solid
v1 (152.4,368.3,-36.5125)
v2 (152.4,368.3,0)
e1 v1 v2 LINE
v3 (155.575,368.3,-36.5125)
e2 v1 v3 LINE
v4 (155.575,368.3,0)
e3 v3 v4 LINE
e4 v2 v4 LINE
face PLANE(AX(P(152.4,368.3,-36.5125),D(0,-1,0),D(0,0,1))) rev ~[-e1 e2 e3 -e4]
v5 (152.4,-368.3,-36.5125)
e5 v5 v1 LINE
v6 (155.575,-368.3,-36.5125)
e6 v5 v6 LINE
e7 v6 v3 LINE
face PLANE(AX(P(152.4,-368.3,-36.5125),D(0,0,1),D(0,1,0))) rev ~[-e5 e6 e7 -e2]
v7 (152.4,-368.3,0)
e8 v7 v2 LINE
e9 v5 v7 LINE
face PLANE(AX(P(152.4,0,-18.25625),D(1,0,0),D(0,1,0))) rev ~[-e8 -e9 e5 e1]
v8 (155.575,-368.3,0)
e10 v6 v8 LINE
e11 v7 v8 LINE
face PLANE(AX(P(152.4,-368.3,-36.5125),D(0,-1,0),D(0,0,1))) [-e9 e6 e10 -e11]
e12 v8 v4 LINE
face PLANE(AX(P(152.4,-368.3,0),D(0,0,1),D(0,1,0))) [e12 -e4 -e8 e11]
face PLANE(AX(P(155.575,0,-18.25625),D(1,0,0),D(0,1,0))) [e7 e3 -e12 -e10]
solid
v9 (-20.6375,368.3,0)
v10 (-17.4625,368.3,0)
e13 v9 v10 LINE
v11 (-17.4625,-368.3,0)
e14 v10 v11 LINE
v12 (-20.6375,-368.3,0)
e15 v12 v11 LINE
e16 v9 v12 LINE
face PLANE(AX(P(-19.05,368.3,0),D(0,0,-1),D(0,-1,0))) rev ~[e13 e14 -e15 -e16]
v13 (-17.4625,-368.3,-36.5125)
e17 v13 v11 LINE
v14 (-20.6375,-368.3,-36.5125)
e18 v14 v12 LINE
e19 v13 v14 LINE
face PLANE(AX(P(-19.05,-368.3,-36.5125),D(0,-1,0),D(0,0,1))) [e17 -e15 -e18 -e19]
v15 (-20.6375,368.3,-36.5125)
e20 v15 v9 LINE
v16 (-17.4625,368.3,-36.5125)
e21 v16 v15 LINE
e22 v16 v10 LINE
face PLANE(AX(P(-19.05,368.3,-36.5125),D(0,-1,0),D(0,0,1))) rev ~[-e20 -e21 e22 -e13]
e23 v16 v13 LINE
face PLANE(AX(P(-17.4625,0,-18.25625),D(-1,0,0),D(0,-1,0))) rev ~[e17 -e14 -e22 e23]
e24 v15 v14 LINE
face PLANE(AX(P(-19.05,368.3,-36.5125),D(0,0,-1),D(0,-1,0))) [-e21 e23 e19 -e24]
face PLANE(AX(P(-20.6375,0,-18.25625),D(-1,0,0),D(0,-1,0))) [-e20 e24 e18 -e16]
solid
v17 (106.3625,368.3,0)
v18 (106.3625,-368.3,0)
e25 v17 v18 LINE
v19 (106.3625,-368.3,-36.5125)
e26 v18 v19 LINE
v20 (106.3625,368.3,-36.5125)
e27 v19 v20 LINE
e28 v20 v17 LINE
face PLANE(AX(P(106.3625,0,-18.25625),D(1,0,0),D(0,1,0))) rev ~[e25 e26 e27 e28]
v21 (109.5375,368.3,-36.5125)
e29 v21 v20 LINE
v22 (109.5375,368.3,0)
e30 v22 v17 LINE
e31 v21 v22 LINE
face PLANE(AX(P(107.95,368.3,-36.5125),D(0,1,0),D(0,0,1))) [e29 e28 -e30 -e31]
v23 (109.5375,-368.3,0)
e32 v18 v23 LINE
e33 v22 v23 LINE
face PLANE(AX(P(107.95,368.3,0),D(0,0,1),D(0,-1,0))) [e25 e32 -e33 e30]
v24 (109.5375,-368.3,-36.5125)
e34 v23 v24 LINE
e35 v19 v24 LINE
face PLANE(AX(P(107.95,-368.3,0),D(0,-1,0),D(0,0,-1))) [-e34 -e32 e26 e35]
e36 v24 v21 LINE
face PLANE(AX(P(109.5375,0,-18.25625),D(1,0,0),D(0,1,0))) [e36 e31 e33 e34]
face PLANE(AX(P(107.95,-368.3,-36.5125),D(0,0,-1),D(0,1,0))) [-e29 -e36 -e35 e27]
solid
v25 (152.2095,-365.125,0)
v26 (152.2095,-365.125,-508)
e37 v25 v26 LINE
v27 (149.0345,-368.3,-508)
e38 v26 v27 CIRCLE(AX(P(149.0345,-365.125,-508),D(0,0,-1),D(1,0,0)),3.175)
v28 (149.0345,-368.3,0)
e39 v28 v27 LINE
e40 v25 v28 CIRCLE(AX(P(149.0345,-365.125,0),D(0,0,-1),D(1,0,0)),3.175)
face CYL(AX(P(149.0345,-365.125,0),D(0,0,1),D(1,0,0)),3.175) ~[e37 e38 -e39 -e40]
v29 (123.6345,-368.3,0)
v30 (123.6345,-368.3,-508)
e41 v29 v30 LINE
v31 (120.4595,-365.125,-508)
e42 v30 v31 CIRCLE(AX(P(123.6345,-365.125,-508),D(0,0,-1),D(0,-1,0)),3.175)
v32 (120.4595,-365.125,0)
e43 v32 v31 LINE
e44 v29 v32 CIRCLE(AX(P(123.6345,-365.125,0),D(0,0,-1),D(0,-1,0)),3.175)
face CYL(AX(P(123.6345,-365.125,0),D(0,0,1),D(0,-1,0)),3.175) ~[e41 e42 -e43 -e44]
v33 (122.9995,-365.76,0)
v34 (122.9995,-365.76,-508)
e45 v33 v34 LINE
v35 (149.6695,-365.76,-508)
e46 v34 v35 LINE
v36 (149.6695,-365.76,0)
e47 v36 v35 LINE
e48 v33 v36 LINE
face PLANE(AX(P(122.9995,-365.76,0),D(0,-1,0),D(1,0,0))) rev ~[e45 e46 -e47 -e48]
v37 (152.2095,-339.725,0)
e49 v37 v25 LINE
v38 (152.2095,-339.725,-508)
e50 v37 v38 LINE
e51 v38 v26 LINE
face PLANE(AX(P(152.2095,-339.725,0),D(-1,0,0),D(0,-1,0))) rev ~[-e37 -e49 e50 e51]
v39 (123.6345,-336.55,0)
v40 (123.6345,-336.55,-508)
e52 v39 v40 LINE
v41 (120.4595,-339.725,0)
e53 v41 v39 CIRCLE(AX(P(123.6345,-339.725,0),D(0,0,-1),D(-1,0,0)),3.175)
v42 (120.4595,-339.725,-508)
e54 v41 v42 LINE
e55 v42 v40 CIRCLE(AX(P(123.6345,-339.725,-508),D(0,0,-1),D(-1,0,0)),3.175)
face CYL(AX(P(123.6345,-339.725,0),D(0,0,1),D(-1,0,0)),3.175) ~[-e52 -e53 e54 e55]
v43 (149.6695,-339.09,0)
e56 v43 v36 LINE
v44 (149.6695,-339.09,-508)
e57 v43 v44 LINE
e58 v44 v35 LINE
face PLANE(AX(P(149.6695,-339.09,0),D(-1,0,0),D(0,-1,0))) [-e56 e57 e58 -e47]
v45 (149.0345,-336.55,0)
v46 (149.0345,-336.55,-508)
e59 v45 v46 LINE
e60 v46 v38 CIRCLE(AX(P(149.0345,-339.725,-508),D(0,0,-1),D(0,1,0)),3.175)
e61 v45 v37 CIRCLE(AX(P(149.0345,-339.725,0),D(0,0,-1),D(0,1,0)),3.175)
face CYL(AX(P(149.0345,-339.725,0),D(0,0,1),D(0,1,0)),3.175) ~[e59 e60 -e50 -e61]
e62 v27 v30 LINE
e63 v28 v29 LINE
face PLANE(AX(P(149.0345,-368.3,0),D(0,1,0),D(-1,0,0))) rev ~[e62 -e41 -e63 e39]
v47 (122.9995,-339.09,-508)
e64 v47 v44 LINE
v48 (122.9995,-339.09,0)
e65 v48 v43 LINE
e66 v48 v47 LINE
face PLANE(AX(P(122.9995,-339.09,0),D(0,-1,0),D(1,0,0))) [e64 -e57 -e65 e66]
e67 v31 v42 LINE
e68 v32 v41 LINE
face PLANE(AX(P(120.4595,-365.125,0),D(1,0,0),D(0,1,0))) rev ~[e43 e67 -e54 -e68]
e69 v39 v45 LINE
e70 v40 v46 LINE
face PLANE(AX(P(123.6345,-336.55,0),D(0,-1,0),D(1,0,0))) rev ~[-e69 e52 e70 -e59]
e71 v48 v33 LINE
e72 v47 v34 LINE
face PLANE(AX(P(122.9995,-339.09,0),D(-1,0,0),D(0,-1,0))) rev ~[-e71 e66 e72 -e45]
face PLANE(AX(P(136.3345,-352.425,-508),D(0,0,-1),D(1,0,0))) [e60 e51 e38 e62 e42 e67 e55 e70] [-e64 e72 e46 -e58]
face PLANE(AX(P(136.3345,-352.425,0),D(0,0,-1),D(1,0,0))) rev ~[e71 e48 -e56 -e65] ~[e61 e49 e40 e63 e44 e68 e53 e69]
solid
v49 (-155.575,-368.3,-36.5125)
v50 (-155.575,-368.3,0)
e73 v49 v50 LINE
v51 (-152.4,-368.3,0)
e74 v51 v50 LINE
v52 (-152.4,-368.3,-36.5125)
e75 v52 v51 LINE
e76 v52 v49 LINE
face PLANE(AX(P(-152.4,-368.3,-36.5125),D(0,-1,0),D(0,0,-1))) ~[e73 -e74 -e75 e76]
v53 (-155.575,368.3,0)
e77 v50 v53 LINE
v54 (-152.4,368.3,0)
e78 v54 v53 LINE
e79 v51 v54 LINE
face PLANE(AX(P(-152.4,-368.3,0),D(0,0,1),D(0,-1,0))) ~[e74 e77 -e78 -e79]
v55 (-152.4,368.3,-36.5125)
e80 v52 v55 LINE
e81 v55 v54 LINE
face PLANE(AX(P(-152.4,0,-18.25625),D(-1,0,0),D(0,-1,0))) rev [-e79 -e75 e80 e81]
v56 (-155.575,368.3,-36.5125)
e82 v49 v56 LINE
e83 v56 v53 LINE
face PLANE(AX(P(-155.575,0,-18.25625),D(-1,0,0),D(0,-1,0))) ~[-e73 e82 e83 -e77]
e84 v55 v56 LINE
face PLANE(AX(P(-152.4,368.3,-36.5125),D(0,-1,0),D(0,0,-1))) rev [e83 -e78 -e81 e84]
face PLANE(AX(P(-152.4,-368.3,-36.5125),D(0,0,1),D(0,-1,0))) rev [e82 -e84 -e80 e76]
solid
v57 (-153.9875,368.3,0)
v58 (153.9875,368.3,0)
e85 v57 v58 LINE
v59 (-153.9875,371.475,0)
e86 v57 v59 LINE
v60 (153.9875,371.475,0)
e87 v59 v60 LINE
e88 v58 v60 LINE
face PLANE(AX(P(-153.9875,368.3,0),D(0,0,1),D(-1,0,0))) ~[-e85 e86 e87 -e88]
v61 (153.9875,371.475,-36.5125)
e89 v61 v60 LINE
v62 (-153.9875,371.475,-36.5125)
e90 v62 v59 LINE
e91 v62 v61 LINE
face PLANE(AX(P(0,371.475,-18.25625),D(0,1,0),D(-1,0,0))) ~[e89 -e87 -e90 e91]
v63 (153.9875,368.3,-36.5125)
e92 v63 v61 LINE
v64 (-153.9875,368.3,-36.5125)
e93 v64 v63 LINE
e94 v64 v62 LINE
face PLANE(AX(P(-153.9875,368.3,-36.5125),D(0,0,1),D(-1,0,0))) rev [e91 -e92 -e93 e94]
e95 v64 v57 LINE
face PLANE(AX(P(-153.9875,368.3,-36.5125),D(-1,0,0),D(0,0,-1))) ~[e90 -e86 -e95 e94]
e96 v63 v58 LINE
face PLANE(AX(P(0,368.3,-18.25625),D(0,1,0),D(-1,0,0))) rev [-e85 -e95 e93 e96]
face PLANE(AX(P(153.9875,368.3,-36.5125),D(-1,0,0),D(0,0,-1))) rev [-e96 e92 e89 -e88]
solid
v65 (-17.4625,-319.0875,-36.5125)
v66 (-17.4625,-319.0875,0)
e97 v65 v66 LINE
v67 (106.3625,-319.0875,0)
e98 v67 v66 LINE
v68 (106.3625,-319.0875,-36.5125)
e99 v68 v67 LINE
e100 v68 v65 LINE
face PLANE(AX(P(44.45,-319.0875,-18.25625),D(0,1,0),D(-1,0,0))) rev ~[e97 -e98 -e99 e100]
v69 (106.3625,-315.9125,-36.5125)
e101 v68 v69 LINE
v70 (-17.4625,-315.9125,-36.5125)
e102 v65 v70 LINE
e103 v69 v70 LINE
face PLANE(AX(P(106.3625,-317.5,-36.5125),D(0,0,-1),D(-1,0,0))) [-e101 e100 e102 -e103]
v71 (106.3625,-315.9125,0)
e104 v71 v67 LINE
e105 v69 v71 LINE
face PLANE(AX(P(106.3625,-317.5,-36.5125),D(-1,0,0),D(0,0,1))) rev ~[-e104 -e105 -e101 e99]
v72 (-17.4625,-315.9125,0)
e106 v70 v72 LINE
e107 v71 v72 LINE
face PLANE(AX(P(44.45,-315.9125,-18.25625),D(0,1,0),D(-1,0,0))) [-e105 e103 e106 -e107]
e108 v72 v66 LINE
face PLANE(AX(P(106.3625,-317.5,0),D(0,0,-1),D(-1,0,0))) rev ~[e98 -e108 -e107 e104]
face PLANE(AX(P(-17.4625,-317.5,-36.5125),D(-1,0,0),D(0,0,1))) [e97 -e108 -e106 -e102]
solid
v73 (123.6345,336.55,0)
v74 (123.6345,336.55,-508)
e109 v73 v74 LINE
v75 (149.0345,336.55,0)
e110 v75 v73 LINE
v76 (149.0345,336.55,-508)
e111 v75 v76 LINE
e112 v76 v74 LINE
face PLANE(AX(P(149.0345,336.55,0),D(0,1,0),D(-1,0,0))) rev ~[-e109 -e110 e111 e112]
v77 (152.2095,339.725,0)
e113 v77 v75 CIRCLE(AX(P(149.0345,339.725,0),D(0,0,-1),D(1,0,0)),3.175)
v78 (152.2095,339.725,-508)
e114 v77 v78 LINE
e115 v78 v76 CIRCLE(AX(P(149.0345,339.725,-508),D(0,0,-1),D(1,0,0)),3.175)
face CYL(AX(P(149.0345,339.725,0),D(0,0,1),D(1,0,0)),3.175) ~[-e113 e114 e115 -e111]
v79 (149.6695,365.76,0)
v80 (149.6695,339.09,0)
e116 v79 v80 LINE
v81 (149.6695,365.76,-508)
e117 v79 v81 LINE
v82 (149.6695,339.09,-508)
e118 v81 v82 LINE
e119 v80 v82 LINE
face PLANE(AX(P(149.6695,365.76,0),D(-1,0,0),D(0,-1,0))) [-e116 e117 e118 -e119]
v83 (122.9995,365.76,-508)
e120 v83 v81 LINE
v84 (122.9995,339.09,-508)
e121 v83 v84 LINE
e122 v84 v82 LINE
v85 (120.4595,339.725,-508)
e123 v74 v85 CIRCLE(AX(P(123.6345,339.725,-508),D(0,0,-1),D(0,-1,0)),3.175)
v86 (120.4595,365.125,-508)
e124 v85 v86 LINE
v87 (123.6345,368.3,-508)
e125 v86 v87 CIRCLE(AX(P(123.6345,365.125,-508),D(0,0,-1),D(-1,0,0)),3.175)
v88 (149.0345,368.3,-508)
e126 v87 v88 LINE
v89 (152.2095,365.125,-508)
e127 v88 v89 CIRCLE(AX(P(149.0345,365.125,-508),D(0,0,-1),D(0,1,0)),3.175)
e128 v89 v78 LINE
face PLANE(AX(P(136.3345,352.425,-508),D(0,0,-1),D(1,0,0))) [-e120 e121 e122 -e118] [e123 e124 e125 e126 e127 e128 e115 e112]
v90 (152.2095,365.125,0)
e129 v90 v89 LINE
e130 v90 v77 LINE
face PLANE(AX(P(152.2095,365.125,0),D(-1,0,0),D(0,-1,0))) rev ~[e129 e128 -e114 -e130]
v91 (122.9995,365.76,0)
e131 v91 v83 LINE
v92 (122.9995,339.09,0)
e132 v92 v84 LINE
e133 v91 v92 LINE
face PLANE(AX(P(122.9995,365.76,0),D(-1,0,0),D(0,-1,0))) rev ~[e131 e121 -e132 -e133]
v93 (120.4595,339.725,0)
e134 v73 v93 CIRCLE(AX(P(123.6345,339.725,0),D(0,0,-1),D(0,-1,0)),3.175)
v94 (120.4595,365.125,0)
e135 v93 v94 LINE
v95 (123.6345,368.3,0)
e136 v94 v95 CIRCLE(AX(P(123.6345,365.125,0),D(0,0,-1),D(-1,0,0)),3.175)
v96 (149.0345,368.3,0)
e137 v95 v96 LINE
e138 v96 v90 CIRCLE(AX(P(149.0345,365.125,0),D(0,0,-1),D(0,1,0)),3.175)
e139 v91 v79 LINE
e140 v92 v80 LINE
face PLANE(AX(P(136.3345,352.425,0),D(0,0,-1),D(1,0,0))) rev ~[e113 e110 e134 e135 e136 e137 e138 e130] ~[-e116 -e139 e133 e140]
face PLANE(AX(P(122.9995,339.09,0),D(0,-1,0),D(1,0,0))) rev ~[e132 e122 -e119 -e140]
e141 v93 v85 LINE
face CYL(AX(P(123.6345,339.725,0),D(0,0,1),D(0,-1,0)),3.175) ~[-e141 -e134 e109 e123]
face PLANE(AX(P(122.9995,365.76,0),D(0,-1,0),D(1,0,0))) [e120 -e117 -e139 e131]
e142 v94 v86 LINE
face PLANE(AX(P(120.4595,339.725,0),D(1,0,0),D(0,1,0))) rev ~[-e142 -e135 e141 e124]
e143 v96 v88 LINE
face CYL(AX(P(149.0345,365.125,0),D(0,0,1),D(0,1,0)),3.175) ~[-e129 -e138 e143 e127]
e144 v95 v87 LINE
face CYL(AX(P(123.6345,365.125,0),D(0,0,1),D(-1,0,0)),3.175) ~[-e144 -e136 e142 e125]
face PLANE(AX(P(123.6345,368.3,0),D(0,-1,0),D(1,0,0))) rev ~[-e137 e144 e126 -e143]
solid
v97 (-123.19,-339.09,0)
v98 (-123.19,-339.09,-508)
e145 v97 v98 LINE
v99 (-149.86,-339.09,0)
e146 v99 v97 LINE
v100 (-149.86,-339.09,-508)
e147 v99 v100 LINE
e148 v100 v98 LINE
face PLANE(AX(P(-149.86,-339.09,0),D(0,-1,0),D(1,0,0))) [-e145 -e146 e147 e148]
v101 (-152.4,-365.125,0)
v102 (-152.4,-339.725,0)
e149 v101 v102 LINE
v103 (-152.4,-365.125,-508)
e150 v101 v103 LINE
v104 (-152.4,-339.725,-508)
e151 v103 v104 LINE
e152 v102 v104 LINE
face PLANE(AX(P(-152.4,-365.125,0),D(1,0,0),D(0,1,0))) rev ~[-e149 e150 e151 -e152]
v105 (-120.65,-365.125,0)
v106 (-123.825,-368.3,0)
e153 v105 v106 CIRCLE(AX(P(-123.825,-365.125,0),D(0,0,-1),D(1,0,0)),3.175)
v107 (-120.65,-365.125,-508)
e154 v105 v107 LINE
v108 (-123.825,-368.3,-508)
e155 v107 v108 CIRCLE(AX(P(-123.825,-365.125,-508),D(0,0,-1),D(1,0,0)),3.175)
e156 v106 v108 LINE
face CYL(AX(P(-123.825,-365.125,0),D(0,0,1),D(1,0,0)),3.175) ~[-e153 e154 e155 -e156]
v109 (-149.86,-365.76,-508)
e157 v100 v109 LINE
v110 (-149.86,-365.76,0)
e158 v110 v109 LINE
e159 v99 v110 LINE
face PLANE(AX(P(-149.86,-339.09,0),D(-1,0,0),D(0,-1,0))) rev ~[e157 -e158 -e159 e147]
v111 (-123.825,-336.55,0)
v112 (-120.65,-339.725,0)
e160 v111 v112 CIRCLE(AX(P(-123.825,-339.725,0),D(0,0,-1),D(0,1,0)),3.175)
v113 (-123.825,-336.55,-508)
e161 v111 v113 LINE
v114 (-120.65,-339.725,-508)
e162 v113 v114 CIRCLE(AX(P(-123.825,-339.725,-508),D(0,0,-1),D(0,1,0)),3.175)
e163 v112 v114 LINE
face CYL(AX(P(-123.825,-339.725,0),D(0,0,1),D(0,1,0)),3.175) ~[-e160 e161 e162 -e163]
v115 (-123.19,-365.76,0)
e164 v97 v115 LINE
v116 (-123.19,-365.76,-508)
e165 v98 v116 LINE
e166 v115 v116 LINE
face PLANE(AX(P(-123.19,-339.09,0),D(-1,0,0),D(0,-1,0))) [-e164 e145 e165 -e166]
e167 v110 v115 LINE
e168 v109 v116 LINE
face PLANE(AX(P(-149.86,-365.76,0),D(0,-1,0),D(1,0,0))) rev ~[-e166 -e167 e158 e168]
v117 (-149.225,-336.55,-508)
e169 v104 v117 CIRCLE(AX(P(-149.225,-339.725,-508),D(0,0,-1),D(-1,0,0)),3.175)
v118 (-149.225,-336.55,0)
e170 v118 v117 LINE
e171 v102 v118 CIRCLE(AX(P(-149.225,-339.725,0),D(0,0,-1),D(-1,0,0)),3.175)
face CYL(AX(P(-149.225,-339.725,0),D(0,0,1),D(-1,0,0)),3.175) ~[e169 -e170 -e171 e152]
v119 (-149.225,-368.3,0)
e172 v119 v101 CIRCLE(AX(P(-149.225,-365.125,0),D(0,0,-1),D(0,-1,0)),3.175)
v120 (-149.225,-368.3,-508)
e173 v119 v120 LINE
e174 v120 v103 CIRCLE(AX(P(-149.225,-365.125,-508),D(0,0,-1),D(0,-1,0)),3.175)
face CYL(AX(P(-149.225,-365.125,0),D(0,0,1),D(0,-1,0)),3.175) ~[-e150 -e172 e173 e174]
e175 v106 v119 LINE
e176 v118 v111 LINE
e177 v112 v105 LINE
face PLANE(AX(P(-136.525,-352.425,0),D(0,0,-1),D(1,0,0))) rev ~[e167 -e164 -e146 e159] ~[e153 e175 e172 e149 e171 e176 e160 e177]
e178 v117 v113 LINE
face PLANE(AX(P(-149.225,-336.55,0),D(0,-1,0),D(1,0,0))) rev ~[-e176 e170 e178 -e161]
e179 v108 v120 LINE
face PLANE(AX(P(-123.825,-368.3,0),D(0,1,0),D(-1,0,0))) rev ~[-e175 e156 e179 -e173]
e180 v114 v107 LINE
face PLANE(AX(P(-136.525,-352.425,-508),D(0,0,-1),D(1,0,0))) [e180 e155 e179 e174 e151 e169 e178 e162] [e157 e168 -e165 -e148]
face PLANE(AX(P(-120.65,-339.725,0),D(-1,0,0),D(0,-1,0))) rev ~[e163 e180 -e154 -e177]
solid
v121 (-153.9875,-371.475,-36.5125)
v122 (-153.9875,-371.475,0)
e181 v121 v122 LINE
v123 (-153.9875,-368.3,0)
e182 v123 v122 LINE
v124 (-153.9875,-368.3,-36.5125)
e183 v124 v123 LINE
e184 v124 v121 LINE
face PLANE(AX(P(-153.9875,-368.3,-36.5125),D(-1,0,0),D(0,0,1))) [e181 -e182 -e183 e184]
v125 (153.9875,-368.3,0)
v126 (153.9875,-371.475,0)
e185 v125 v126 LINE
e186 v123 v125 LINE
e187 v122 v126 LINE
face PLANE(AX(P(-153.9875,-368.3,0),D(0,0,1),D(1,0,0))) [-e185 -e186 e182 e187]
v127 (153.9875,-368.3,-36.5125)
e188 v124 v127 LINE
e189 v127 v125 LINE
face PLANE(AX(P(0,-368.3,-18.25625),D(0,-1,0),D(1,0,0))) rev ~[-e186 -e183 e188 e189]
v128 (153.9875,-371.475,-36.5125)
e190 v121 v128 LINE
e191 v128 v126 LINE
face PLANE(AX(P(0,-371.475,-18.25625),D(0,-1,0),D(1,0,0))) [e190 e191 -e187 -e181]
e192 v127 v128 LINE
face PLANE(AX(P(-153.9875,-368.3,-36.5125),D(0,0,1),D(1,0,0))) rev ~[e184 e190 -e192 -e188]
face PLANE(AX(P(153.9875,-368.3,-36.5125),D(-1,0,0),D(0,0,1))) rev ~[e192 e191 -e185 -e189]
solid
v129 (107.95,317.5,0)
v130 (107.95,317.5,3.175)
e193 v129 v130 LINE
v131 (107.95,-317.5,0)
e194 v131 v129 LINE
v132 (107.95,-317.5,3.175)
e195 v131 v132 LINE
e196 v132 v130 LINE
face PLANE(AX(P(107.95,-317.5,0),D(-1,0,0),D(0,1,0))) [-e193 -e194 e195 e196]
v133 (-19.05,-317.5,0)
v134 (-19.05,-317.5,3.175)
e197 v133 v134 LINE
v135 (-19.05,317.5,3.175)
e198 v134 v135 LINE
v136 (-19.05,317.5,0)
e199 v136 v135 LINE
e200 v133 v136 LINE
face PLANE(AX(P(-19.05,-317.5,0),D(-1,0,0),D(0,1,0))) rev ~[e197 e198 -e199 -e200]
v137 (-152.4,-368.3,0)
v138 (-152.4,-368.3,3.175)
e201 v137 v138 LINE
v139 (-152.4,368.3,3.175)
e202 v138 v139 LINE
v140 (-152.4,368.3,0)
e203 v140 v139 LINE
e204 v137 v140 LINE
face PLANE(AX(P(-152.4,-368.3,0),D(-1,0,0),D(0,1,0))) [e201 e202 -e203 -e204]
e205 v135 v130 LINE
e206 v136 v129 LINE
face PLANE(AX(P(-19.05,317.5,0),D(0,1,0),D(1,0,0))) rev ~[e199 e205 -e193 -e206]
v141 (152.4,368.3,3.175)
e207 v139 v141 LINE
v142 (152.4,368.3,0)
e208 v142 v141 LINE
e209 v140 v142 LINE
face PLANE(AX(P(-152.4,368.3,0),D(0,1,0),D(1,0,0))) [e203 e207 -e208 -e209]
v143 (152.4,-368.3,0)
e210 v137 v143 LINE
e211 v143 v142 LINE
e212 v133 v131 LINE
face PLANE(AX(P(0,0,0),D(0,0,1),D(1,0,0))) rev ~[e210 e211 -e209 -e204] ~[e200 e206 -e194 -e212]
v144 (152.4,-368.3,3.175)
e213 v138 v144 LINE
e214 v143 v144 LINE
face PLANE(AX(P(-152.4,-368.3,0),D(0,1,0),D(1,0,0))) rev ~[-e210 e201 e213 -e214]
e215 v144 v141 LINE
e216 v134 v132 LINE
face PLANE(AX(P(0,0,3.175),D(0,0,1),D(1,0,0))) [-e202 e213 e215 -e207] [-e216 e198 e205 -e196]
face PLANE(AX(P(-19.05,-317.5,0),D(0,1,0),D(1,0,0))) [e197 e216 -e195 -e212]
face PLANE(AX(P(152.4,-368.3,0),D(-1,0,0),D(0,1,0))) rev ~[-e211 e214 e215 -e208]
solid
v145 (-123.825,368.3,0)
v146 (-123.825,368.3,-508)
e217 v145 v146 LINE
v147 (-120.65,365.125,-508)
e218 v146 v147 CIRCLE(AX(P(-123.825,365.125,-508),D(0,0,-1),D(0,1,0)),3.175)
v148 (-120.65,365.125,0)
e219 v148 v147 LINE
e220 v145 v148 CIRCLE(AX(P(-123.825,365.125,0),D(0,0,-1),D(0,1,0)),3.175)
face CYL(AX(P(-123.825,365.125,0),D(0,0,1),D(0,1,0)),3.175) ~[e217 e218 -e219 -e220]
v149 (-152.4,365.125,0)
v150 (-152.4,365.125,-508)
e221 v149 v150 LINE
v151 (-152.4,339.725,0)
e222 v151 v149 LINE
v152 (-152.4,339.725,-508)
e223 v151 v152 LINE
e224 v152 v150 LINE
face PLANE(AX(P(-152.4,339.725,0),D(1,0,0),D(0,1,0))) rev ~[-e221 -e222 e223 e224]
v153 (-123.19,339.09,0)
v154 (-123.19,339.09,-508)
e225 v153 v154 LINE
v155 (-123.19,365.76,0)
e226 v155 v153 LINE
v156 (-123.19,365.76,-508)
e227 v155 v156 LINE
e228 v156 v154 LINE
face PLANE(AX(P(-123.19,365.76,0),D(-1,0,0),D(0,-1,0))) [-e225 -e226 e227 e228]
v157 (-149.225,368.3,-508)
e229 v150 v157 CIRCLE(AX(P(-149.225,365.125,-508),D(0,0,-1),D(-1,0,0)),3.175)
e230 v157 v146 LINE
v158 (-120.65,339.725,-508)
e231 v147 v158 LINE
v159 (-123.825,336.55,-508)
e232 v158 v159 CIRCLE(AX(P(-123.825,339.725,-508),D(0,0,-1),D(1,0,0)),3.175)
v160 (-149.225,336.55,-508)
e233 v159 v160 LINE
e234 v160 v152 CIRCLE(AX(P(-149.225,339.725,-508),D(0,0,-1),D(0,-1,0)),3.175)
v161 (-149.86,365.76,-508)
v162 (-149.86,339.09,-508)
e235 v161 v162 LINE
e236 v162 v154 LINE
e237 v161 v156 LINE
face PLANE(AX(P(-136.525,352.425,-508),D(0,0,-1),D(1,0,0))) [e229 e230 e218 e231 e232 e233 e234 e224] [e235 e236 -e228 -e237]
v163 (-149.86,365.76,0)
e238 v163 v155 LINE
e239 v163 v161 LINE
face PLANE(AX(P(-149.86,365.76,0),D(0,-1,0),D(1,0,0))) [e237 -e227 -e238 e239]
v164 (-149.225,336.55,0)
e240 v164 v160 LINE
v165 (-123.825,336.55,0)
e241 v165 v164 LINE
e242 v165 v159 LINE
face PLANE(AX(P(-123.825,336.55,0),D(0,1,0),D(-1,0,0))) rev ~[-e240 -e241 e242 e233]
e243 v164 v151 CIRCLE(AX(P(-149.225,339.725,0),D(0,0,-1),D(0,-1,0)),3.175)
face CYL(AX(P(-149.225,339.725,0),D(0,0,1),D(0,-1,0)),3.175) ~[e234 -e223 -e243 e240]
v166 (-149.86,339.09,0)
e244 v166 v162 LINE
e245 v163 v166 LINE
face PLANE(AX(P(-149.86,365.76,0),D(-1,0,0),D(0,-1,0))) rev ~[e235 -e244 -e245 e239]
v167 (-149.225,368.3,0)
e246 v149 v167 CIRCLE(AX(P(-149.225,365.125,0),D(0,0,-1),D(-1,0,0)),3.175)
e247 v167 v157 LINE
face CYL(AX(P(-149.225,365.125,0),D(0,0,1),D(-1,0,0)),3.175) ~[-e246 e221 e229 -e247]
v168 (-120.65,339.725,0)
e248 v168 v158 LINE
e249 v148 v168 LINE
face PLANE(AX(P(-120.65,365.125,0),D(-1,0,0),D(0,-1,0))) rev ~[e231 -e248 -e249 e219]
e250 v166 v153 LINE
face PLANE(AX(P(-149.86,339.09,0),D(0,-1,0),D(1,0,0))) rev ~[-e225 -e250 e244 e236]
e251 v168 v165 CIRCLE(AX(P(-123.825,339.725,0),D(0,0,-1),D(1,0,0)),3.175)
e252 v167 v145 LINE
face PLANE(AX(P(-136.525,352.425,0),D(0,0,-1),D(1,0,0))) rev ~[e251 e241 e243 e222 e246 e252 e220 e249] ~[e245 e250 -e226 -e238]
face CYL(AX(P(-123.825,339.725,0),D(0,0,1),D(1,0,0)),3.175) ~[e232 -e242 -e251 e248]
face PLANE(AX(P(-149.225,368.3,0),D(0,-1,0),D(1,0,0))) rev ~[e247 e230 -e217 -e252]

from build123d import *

# Parameters (mm, degrees)
F0_W      = 304.8
F0_H      = 736.6
F0_W_2    = 127
F0_H_2    = 635
F1_DEPTH  = 3.175
F2_W      = 736.6
F2_H      = 36.5125
F3_DEPTH  = 3.175
F5_W      = 307.975
F5_H      = 36.5125
F6_DEPTH  = 3.175
F9_W      = 736.6
F9_H      = 36.5125
F10_DEPTH = 1.5875
F13_DEPTH = 1.5875
F15_W     = 123.825
F15_H     = 36.5125
F16_DEPTH = 1.5875
F17_W     = 26.67
F17_H     = 26.67
F18_DEPTH = 508


with BuildPart() as f1:
    # F0 (on Top) → F1 (new body)
    with BuildSketch(Plane.XY):
        Rectangle(F0_W, F0_H)
        with Locations((44.45, 0)):
            Rectangle(F0_W_2, F0_H_2, mode=Mode.SUBTRACT)
    extrude(amount=F1_DEPTH)


with BuildPart() as f3:
    # F2 (on face) → F3 (new body)
    with BuildSketch(Plane.YZ.offset(152.4)):
        with Locations((0, -18.25625)):
            Rectangle(F2_W, F2_H)
    extrude(amount=F3_DEPTH)


with BuildPart() as f4_1:
    # F4: instance of F3
    add(f3.part.mirror(Plane.YZ))


with BuildPart() as f6:
    # F5 (on face) → F6 (new body)
    with BuildSketch(Plane.XZ.offset(368.3)):
        with Locations((0, -18.25625)):
            Rectangle(F5_W, F5_H)
    extrude(amount=F6_DEPTH)


with BuildPart() as f7_1:
    # F7: instance of F6
    add(f6.part.mirror(Plane.XZ))


with BuildPart() as f10:
    # F9 (on face) → F10 (new body, symmetric)
    with BuildSketch(Plane(origin=(-19.05, 0, 0), x_dir=(0, -1, 0), z_dir=(-1, 0, 0))):
        with Locations((0, -18.25625)):
            Rectangle(F9_W, F9_H)
    extrude(amount=F10_DEPTH, both=True)


with BuildPart() as f13:
    # F12 (on face) → F13 (new body, symmetric)
    with BuildSketch(Plane.YZ.offset(107.95)):
        Polygon((368.3, 0), (317.5, 0), (-317.5, 0), (-368.3, 0), (-368.3, -36.5125), (368.3, -36.5125), align=None)
    extrude(amount=F13_DEPTH, both=True)


with BuildPart() as f16:
    # F15 (on face) → F16 (new body, symmetric)
    with BuildSketch(Plane(origin=(0, -317.5, 0), x_dir=(-1, 0, 0), z_dir=(0, 1, 0))):
        with Locations((-44.45, -18.25625)):
            Rectangle(F15_W, F15_H)
    extrude(amount=F16_DEPTH, both=True)


with BuildPart() as f18:
    # F17 (on face) → F18 (new body)
    with BuildSketch(Plane(origin=(0, 0, 0), x_dir=(1, 0, 0), z_dir=(0, 0, -1))):
        with BuildLine():
            Line((-123.825, 368.3), (-149.225, 368.3))
            ThreePointArc((-149.225, 368.3), (-151.4700640303, 367.3700640303), (-152.4, 365.125))
            Line((-152.4, 365.125), (-152.4, 339.725))
            ThreePointArc((-152.4, 339.725), (-151.4700640303, 337.4799359697), (-149.225, 336.55))
            Line((-149.225, 336.55), (-123.825, 336.55))
            ThreePointArc((-123.825, 336.55), (-121.5799359697, 337.4799359697), (-120.65, 339.725))
            Line((-120.65, 339.725), (-120.65, 365.125))
            ThreePointArc((-120.65, 365.125), (-121.5799359697, 367.3700640303), (-123.825, 368.3))
        make_face()
        with Locations((-136.525, 352.425)):
            Rectangle(F17_W, F17_H, mode=Mode.SUBTRACT)
    extrude(amount=F18_DEPTH)


with BuildPart() as f18b:
    # F17 (on face) → F18, piece 2 (new body)
    with BuildSketch(Plane(origin=(0, 0, 0), x_dir=(1, 0, 0), z_dir=(0, 0, -1))):
        with BuildLine():
            Line((-120.65, -365.125), (-120.65, -339.725))
            ThreePointArc((-120.65, -339.725), (-121.5799359697, -337.4799359697), (-123.825, -336.55))
            Line((-123.825, -336.55), (-149.225, -336.55))
            ThreePointArc((-149.225, -336.55), (-151.4700640303, -337.4799359697), (-152.4, -339.725))
            Line((-152.4, -339.725), (-152.4, -365.125))
            ThreePointArc((-152.4, -365.125), (-151.4700640303, -367.3700640303), (-149.225, -368.3))
            Line((-149.225, -368.3), (-123.825, -368.3))
            ThreePointArc((-123.825, -368.3), (-121.5799359697, -367.3700640303), (-120.65, -365.125))
        make_face()
        with Locations((-136.525, -352.425)):
            Rectangle(F17_W, F17_H, mode=Mode.SUBTRACT)
    extrude(amount=F18_DEPTH)


with BuildPart() as f18c:
    # F17 (on face) → F18, piece 3 (new body)
    with BuildSketch(Plane(origin=(0, 0, 0), x_dir=(1, 0, 0), z_dir=(0, 0, -1))):
        with BuildLine():
            Line((152.2095, 339.725), (152.2095, 365.125))
            ThreePointArc((152.2095, 365.125), (151.2795640303, 367.3700640303), (149.0345, 368.3))
            Line((149.0345, 368.3), (123.6345, 368.3))
            ThreePointArc((123.6345, 368.3), (121.3894359697, 367.3700640303), (120.4595, 365.125))
            Line((120.4595, 365.125), (120.4595, 339.725))
            ThreePointArc((120.4595, 339.725), (121.3894359697, 337.4799359697), (123.6345, 336.55))
            Line((123.6345, 336.55), (149.0345, 336.55))
            ThreePointArc((149.0345, 336.55), (151.2795640303, 337.4799359697), (152.2095, 339.725))
        make_face()
        with Locations((136.3345, 352.425)):
            Rectangle(F17_W, F17_H, mode=Mode.SUBTRACT)
    extrude(amount=F18_DEPTH)


with BuildPart() as f18d:
    # F17 (on face) → F18, piece 4 (new body)
    with BuildSketch(Plane(origin=(0, 0, 0), x_dir=(1, 0, 0), z_dir=(0, 0, -1))):
        with BuildLine():
            Line((152.2095, -365.125), (152.2095, -339.725))
            ThreePointArc((152.2095, -339.725), (151.2795640303, -337.4799359697), (149.0345, -336.55))
            Line((149.0345, -336.55), (123.6345, -336.55))
            ThreePointArc((123.6345, -336.55), (121.3894359697, -337.4799359697), (120.4595, -339.725))
            Line((120.4595, -339.725), (120.4595, -365.125))
            ThreePointArc((120.4595, -365.125), (121.3894359697, -367.3700640303), (123.6345, -368.3))
            Line((123.6345, -368.3), (149.0345, -368.3))
            ThreePointArc((149.0345, -368.3), (151.2795640303, -367.3700640303), (152.2095, -365.125))
        make_face()
        with Locations((136.3345, -352.425)):
            Rectangle(F17_W, F17_H, mode=Mode.SUBTRACT)
    extrude(amount=F18_DEPTH)


solid = Compound([f1.part, f3.part, f4_1.part, f6.part, f7_1.part, f10.part, f13.part, f16.part, f18.part, f18b.part, f18c.part, f18d.part])
